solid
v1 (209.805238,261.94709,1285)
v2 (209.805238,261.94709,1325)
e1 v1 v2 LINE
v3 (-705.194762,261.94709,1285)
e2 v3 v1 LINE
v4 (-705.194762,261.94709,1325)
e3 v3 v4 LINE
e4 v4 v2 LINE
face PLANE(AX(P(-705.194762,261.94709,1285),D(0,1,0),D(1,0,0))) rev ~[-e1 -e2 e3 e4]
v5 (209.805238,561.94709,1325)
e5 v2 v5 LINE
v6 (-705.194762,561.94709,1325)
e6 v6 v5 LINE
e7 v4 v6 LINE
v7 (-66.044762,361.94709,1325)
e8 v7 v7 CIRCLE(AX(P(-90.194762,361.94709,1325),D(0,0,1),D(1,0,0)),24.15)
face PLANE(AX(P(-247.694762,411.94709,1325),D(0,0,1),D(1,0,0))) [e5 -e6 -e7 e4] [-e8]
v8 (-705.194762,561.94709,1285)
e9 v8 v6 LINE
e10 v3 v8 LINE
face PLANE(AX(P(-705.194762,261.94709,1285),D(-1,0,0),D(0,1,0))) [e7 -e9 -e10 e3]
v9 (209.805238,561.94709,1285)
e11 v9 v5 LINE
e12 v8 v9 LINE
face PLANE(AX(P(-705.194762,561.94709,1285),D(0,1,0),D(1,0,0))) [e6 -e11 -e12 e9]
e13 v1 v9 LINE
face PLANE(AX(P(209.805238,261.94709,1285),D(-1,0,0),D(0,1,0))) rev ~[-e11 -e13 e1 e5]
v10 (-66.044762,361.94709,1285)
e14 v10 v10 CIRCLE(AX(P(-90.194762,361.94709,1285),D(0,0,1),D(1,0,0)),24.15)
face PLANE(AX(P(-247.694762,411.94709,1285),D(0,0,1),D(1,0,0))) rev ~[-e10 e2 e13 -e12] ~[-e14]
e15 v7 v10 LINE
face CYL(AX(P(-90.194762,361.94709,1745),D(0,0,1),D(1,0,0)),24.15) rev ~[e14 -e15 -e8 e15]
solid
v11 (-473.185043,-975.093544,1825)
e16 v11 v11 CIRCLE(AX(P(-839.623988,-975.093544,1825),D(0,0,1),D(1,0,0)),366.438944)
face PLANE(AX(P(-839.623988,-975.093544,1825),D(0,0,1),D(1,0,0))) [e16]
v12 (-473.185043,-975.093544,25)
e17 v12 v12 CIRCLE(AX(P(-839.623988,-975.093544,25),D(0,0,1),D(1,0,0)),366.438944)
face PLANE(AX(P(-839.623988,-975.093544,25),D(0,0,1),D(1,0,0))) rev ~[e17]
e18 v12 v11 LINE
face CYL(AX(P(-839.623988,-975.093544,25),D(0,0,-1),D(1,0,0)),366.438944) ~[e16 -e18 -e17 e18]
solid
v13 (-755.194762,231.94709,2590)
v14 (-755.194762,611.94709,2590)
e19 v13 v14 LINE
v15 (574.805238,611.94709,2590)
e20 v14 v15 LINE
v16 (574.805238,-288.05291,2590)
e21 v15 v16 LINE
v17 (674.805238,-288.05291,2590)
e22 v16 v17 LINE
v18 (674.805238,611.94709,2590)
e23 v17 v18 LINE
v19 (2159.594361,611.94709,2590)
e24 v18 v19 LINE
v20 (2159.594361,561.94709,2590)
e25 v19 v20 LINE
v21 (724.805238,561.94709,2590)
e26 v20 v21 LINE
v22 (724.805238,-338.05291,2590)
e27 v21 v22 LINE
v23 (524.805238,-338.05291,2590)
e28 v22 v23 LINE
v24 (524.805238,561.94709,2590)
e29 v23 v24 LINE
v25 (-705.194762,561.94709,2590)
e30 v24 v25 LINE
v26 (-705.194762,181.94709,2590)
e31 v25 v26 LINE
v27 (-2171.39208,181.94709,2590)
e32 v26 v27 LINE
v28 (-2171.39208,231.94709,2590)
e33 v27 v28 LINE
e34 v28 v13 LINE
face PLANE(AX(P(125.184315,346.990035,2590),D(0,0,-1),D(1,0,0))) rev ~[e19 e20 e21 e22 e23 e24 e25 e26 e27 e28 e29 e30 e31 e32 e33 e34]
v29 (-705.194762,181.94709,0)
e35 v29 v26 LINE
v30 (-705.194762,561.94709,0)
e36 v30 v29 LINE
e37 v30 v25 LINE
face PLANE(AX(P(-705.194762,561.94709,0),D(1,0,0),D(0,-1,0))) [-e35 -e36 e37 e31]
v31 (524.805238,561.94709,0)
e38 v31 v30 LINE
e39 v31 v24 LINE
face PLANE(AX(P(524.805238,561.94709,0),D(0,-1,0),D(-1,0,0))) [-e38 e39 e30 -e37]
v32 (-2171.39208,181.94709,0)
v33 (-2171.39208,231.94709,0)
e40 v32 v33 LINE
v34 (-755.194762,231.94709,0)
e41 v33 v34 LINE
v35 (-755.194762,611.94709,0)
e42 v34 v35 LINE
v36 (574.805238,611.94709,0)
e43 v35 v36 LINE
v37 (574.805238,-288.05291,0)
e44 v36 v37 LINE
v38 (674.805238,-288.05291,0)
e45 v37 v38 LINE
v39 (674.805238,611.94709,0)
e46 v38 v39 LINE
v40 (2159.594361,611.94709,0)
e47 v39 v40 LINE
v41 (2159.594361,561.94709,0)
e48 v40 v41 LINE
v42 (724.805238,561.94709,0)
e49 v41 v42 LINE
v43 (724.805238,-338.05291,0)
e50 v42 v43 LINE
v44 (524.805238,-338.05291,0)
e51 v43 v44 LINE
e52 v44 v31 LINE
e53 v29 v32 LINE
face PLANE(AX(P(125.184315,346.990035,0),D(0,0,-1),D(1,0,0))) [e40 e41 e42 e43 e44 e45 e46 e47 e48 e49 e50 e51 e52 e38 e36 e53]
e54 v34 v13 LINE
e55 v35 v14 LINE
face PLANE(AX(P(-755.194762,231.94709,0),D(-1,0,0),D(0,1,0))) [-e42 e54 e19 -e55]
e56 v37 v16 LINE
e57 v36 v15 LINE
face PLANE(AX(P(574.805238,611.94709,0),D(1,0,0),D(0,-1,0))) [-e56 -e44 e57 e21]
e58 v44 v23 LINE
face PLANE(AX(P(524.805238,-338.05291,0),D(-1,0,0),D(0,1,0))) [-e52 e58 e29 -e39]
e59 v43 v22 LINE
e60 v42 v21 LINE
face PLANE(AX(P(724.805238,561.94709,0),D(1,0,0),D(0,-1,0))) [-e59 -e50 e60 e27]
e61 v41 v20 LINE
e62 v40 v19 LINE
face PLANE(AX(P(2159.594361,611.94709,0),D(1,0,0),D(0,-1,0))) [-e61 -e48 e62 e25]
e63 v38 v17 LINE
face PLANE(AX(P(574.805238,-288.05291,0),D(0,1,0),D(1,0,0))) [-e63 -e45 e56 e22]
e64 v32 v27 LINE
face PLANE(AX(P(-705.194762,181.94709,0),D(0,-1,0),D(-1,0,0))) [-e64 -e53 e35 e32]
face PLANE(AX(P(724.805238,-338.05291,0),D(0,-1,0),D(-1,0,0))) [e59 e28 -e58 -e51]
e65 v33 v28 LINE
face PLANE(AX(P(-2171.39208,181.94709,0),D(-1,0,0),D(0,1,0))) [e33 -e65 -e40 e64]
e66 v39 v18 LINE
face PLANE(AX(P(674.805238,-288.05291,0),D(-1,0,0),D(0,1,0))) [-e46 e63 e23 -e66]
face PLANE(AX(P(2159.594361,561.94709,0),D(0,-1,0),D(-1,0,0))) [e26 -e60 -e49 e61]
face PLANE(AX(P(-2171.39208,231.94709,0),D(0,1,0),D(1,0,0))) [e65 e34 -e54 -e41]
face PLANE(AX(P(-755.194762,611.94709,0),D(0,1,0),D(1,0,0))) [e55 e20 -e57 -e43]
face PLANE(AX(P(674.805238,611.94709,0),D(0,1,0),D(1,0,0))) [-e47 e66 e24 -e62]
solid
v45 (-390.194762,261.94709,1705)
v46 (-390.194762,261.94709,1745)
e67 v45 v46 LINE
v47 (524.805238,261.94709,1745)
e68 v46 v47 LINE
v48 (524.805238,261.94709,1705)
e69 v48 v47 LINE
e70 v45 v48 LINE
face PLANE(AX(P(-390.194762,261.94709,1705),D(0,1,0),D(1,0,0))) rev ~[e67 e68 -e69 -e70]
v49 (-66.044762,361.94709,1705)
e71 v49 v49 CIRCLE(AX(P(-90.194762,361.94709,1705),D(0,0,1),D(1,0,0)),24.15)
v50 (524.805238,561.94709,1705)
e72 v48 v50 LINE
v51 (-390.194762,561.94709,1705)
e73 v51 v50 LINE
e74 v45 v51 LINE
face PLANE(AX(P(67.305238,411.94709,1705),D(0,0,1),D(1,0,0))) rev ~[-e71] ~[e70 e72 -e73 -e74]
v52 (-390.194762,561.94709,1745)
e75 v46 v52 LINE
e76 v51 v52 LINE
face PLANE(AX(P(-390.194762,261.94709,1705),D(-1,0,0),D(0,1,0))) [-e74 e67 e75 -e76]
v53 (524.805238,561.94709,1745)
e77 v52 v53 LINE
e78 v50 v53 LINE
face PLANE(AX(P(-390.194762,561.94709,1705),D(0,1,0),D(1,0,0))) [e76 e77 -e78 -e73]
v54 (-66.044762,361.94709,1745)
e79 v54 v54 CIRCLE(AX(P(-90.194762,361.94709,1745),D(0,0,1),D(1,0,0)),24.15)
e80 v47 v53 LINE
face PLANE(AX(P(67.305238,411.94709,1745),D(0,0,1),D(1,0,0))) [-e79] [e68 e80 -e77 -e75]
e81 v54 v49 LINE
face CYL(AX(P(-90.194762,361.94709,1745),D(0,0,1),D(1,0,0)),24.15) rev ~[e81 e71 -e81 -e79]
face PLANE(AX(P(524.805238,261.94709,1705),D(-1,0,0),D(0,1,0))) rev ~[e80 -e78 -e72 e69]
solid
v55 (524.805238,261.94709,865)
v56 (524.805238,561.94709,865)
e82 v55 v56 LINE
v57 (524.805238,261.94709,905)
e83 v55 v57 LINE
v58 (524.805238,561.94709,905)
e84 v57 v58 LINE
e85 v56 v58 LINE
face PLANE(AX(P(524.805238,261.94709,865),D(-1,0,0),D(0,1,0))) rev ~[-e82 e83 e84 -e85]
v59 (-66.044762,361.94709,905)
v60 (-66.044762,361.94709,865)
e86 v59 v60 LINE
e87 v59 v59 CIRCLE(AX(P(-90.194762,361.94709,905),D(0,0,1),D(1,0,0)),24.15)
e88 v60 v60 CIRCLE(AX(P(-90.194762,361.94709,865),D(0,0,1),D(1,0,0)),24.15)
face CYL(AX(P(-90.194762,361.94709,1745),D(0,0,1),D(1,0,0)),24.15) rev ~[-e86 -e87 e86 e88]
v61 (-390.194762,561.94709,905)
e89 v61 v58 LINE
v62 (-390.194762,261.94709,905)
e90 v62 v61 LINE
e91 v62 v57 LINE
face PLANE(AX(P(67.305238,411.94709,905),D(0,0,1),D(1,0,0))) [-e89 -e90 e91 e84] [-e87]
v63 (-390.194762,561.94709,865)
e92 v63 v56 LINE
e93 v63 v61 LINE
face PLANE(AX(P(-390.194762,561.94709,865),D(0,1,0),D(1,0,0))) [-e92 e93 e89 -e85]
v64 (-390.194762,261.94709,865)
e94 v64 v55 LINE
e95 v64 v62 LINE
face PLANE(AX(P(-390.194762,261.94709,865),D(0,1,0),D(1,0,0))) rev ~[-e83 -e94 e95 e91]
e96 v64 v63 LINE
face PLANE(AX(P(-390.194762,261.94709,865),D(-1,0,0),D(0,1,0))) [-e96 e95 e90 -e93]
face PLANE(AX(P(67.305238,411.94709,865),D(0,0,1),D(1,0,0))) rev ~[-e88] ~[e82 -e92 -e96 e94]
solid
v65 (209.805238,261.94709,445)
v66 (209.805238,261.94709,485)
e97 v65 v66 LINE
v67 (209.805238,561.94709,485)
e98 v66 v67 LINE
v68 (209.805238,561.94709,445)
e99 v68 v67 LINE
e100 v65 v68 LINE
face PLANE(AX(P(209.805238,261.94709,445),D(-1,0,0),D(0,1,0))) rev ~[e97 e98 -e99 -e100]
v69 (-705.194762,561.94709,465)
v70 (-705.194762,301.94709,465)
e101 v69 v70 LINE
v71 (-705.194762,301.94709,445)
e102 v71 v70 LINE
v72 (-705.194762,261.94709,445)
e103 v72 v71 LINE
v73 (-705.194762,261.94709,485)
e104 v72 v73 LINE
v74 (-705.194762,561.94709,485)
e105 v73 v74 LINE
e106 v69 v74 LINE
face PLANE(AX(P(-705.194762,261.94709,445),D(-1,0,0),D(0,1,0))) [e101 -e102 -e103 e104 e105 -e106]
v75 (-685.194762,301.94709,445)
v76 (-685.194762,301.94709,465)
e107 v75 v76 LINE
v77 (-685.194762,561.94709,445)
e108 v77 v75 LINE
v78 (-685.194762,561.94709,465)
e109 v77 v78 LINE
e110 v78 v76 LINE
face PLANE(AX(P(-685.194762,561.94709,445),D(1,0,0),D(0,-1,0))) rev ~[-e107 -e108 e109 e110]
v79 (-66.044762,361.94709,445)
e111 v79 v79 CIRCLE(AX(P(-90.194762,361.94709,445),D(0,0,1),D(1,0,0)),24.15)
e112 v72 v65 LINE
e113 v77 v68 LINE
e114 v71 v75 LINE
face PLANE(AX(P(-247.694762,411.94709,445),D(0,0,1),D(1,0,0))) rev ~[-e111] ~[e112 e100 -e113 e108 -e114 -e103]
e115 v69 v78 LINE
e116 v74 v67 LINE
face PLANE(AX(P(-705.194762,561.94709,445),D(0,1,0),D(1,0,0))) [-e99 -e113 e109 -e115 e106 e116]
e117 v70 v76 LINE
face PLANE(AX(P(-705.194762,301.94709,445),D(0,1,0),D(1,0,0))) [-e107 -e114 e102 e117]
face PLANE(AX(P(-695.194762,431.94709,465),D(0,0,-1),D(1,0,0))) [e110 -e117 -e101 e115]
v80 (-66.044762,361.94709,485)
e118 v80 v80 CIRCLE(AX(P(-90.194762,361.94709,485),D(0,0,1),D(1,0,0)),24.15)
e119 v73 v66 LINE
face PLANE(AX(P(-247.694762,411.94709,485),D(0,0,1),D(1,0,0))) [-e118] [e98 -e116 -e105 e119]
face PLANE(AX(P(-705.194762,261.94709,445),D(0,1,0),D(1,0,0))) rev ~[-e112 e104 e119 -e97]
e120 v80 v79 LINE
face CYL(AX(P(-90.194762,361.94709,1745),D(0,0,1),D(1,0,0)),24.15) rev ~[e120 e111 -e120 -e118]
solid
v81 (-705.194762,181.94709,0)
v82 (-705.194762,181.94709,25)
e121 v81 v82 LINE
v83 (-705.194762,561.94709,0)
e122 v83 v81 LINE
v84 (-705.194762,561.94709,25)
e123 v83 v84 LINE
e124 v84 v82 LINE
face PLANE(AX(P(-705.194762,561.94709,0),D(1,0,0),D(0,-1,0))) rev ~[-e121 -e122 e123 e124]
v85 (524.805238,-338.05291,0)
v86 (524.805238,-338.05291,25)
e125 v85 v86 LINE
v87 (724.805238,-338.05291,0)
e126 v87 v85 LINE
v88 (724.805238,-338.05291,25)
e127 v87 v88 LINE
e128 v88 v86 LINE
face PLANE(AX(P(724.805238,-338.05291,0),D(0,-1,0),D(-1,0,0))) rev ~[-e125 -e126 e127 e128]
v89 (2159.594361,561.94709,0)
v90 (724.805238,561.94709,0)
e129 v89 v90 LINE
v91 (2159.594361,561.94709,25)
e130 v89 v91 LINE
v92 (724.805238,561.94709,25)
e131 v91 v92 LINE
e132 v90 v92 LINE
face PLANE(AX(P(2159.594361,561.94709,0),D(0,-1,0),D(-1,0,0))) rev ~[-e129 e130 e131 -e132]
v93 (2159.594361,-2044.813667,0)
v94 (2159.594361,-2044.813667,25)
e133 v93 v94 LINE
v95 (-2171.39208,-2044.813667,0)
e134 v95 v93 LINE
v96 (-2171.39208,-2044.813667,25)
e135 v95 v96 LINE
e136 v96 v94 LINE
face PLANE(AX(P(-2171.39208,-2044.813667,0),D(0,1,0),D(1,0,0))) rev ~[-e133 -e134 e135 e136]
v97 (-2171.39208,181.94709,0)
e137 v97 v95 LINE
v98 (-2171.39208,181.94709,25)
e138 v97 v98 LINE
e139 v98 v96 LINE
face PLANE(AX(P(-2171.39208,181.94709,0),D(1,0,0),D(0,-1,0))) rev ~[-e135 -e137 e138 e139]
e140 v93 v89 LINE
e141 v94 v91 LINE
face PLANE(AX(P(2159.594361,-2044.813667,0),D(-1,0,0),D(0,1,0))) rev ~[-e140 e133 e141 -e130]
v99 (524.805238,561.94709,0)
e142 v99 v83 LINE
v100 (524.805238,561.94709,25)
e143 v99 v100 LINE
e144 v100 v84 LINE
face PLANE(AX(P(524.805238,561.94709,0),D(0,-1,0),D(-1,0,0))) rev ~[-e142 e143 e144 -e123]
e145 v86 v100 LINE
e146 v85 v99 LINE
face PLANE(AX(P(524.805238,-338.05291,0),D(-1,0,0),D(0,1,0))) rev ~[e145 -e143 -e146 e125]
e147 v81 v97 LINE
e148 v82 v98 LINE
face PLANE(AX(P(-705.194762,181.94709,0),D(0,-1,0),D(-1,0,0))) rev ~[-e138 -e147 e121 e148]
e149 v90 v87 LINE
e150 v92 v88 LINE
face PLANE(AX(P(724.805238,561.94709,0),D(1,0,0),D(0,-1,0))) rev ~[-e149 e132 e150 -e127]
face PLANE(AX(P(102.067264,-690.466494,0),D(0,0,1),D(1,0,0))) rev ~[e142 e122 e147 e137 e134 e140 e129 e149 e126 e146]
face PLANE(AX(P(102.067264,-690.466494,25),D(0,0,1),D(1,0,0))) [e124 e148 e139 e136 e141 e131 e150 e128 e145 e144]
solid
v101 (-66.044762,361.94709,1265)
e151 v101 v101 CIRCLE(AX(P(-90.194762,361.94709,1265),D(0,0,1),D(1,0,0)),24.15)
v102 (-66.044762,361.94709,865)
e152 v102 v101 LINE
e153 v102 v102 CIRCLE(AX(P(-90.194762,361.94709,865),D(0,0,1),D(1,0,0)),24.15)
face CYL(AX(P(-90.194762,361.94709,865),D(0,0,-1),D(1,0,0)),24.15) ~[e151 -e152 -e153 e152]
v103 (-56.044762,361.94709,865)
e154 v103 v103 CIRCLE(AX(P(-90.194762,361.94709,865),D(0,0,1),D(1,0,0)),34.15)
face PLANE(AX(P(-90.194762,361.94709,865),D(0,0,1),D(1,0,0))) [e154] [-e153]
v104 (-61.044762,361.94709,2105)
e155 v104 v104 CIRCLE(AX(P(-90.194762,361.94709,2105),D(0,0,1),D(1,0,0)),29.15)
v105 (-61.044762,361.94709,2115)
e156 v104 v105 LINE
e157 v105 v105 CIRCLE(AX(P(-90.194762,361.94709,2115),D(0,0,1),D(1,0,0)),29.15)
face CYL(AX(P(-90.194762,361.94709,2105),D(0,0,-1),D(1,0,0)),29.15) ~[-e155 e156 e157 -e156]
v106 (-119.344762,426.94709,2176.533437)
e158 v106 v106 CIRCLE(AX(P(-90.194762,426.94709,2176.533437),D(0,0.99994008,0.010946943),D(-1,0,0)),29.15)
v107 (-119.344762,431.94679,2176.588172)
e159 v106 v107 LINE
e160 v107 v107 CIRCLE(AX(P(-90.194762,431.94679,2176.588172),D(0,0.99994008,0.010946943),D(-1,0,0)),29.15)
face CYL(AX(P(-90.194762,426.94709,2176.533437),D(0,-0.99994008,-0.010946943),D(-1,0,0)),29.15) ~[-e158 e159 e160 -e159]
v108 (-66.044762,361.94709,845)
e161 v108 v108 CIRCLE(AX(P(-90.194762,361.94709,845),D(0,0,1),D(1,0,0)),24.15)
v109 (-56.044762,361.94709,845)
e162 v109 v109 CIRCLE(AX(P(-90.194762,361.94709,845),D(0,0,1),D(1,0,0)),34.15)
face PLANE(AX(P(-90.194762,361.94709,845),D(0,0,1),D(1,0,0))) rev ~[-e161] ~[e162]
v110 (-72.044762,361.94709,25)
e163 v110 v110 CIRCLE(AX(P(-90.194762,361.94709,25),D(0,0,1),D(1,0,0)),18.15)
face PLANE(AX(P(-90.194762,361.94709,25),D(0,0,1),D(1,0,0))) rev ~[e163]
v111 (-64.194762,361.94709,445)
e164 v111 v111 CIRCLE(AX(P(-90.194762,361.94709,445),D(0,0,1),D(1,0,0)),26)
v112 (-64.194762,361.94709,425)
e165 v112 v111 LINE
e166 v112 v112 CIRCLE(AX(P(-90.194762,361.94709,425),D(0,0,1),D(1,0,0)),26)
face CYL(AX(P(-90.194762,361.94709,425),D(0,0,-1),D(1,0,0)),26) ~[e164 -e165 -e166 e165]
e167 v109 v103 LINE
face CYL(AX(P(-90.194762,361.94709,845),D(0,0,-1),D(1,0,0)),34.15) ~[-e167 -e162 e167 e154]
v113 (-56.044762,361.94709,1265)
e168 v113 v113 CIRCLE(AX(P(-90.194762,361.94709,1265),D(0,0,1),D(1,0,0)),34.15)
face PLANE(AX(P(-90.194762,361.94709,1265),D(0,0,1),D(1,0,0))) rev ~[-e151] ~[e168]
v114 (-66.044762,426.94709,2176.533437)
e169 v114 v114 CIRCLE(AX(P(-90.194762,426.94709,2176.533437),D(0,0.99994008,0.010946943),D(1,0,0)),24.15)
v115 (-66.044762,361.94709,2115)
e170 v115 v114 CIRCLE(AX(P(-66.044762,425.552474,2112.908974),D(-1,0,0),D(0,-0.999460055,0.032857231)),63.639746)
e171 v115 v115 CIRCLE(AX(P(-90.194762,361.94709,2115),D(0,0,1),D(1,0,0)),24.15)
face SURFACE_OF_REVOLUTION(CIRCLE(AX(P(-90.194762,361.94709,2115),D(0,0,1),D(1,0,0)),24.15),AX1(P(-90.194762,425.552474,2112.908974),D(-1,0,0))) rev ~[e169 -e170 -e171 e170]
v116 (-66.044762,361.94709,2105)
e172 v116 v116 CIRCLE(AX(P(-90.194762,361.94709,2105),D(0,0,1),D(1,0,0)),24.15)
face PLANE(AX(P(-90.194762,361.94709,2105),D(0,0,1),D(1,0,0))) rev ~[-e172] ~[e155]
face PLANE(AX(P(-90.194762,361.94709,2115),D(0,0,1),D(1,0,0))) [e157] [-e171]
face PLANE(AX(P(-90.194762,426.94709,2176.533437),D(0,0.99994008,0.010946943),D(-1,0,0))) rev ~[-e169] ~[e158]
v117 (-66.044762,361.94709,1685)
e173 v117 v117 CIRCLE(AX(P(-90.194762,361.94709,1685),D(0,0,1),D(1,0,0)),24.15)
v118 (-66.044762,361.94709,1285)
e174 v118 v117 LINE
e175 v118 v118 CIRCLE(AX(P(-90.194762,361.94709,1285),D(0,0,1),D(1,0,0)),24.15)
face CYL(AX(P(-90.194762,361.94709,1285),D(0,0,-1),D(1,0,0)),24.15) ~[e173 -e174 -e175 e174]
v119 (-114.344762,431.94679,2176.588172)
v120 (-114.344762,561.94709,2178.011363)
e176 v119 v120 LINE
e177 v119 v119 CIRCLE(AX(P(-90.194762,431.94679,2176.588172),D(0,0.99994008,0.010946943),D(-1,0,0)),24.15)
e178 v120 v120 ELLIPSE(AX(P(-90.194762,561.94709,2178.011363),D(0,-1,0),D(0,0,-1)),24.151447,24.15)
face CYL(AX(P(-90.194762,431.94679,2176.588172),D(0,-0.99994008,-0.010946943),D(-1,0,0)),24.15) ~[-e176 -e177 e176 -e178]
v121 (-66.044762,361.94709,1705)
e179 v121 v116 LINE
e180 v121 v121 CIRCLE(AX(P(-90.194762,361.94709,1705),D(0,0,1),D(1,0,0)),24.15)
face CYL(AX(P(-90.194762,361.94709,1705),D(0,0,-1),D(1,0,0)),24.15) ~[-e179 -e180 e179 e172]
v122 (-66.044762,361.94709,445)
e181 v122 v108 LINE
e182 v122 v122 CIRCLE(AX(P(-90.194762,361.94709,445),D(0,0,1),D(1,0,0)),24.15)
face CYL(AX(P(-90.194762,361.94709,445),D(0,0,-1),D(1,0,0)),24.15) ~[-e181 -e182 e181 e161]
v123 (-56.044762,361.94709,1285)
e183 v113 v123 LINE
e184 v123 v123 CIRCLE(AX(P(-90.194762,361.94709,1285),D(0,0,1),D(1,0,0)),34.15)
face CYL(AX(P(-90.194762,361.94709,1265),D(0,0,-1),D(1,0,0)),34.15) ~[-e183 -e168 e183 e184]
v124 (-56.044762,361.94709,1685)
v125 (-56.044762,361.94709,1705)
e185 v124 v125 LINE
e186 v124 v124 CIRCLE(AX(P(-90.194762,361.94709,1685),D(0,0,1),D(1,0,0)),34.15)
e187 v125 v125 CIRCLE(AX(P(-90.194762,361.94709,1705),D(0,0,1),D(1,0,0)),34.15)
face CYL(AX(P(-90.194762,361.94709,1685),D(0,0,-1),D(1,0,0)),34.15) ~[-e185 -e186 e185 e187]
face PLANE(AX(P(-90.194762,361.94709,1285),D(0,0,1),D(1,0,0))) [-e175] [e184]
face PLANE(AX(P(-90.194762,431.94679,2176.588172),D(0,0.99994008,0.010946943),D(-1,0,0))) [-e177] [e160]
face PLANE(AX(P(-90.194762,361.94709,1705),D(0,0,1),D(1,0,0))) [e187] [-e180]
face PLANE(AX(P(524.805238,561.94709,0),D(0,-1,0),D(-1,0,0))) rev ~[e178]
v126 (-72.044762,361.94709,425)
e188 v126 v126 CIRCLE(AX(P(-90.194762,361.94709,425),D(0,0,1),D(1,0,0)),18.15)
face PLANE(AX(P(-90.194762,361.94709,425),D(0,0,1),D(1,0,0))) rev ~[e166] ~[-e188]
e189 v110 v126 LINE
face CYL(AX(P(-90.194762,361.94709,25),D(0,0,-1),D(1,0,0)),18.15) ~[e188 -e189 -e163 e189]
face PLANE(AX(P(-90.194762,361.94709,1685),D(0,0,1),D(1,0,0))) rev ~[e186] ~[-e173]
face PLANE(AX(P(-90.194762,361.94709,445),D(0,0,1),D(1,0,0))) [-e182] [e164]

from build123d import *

# Parameters (mm, degrees)
F1_DEPTH  = 25
F3_DEPTH  = 2590
F9_W      = 915
F9_H      = 300
F10_DEPTH = 40
F11_W     = 915
F11_H     = 300
F12_DEPTH = 40
F13_W     = 915
F13_H     = 300
F14_DEPTH = 40
F15_W     = 915
F15_H     = 300
F16_DEPTH = 40
F17_R     = 18.15
F18_DEPTH = 400
F19_R     = 24.15
F20_DEPTH = 1320
F21_R     = 26
F22_DEPTH = 20
F23_R     = 24.15
F24_DEPTH = 400
F25_R     = 34.15
F26_DEPTH = 20
F27_R     = 24.15
F28_DEPTH = 400
F29_R     = 34.15
F30_DEPTH = 20
F31_R     = 24.15
F32_DEPTH = 400
F33_R     = 34.15
F34_DEPTH = 20
F35_R     = 24.15
F36_DEPTH = 400
F37_R     = 29.15
F38_DEPTH = 10
F42_R     = 24.15
F47_R     = 29.15
F48_DEPTH = 5
F49_R     = 24.15
F50_REACH = 252.8226248047
F51_R     = 366.4389442896
F52_DEPTH = 1800
F53_W     = 20
F53_H     = 260
F54_DEPTH = 20


with BuildPart() as f1:
    # F0 (on Top) → F1 (new body)
    with BuildSketch(Plane.XY):
        Polygon((-705.1947621593, 181.9470898961), (-2171.3920796187, 181.9470898961), (-2171.3920796187, -2044.813666757), (2159.594360915, -2044.813666757), (2159.594360915, 561.9470898961), (724.8052378407, 561.9470898961), (724.8052378407, -338.0529101039), (524.8052378407, -338.0529101039), (524.8052378407, 561.9470898961), (-705.1947621593, 561.9470898961), align=None)
    extrude(amount=F1_DEPTH)


with BuildPart() as f3:
    # F2 (on face) → F3 (new body)
    with BuildSketch(Plane(origin=(0, 0, 0), x_dir=(1, 0, 0), z_dir=(0, 0, -1))):
        Polygon((-705.1947621593, -181.9470898961), (-2171.3920796187, -181.9470898961), (-2171.3920796187, -231.9470898961), (-755.1947621593, -231.9470898961), (-755.1947621593, -611.9470898961), (574.8052378407, -611.9470898961), (574.8052378407, 288.0529101039), (674.8052378407, 288.0529101039), (674.8052378407, -611.9470898961), (2159.594360915, -611.9470898961), (2159.594360915, -561.9470898961), (724.8052378407, -561.9470898961), (724.8052378407, 338.0529101039), (524.8052378407, 338.0529101039), (524.8052378407, -561.9470898961), (-705.1947621593, -561.9470898961), align=None)
    extrude(amount=-F3_DEPTH)


with BuildPart() as f10:
    # F9 (on offset) → F10 (new body)
    with BuildSketch(Plane.XY.offset(445)):
        with Locations((-247.6947621593, 411.9470898961)):
            Rectangle(F9_W, F9_H)
    extrude(amount=F10_DEPTH)


with BuildPart() as f12:
    # F11 (on offset) → F12 (new body)
    with BuildSketch(Plane.XY.offset(865)):
        with Locations((67.3052378407, 411.9470898961)):
            Rectangle(F11_W, F11_H)
    extrude(amount=F12_DEPTH)


with BuildPart() as f14:
    # F13 (on offset) → F14 (new body)
    with BuildSketch(Plane.XY.offset(1285)):
        with Locations((-247.6947621593, 411.9470898961)):
            Rectangle(F13_W, F13_H)
    extrude(amount=F14_DEPTH)


with BuildPart() as f16:
    # F15 (on offset) → F16 (new body)
    with BuildSketch(Plane.XY.offset(1705)):
        with Locations((67.3052378407, 411.9470898961)):
            Rectangle(F15_W, F15_H)
    extrude(amount=F16_DEPTH)


with BuildPart() as f18:
    # F17 (on face) → F18 (new body)
    with BuildSketch(Plane.XY.offset(25)):
        with Locations((-90.1947621593, 361.9470898961)):
            Circle(F17_R)
    extrude(amount=F18_DEPTH)

    # F21 (on face) → F22 (join)
    with BuildSketch(Plane.XY.offset(425)):
        with Locations((-90.1947621593, 361.9470898961)):
            Circle(F21_R)
    extrude(amount=F22_DEPTH)

    # F23 (on face) → F24 (join)
    with BuildSketch(Plane.XY.offset(445)):
        with Locations((-90.1947621593, 361.9470898961)):
            Circle(F23_R)
    extrude(amount=F24_DEPTH)

    # F25 (on face) → F26 (join)
    with BuildSketch(Plane.XY.offset(845)):
        with Locations((-90.1947621593, 361.9470898961)):
            Circle(F25_R)
    extrude(amount=F26_DEPTH)

    # F27 (on face) → F28 (join)
    with BuildSketch(Plane.XY.offset(865)):
        with Locations((-90.1947621593, 361.9470898961)):
            Circle(F27_R)
    extrude(amount=F28_DEPTH)

    # F29 (on face) → F30 (join)
    with BuildSketch(Plane.XY.offset(1265)):
        with Locations((-90.1947621593, 361.9470898961)):
            Circle(F29_R)
    extrude(amount=F30_DEPTH)

    # F31 (on face) → F32 (join)
    with BuildSketch(Plane.XY.offset(1285)):
        with Locations((-90.1947621593, 361.9470898961)):
            Circle(F31_R)
    extrude(amount=F32_DEPTH)

    # F33 (on face) → F34 (join)
    with BuildSketch(Plane.XY.offset(1685)):
        with Locations((-90.1947621593, 361.9470898961)):
            Circle(F33_R)
    extrude(amount=F34_DEPTH)

    # F35 (on face) → F36 (join)
    with BuildSketch(Plane.XY.offset(1705)):
        with Locations((-90.1947621593, 361.9470898961)):
            Circle(F35_R)
    extrude(amount=F36_DEPTH)

    # F37 (on face) → F38 (join)
    with BuildSketch(Plane.XY.offset(2105)):
        with Locations((-90.1947621593, 361.9470898961)):
            Circle(F37_R)
    extrude(amount=F38_DEPTH)

    # F46: sweep along a path in F45
    with BuildLine(Plane(origin=(-90.1947621593, 0, 0), x_dir=(0, -1, 0), z_dir=(-1, 0, 0))) as f46_path:
        ThreePointArc((-361.9470898961, 2115), (-381.8016351531, 2159.12457081), (-426.9470898961, 2176.5334373028))
    # F42 (on face) → F46 (sweep)
    with BuildSketch(Plane.XY.offset(2115)):
        with Locations((-90.1947621593, 361.9470898961)):
            Circle(F42_R)
    sweep(path=f46_path.line)

    # F47 (on face) → F48 (join)
    with BuildSketch(Plane(origin=(0, 450.7208860992, 4.9343114773), x_dir=(-1, 0, 0), z_dir=(0, 0.9999400804, 0.0109469429))):
        with Locations((90.1947621593, 2171.7292549193)):
            Circle(F47_R)
    extrude(amount=F48_DEPTH)

    f50_end = f3.part.faces().sort_by_distance((-90.1947621593, 561.9470898961, 1295))[0]
    # F49 (on face) → F50 (join, up to a face of F3 that its end follows)
    with BuildSketch(Plane(origin=(0, 455.7205865013, 4.9890461919), x_dir=(-1, 0, 0), z_dir=(0, 0.9999400804, 0.0109469429))):
        with Locations((90.1947621593, 2171.7292549193)):
            Circle(F49_R)
    f50_long = extrude(amount=F50_REACH, mode=Mode.PRIVATE)
    add(split(f50_long, bisect_by=f50_end, keep=Keep.TOP, mode=Mode.PRIVATE))


with BuildPart() as f20_tool:
    # F19 (on face) → F20 (new body)
    with BuildSketch(Plane.XY.offset(1745)):
        with Locations((-90.1947621593, 361.9470898961)):
            Circle(F19_R)
    extrude(amount=-F20_DEPTH)


with BuildPart() as f10_1:
    add(f10.part)

    # F20: cut by f20_tool
    add(f20_tool.part, mode=Mode.SUBTRACT)

    # F53 (on face) → F54 (cut)
    with BuildSketch(Plane(origin=(0, 0, 445), x_dir=(1, 0, 0), z_dir=(0, 0, -1))):
        with Locations((-695.1947621593, -431.9470898961)):
            Rectangle(F53_W, F53_H)
    extrude(amount=-F54_DEPTH, mode=Mode.SUBTRACT)


with BuildPart() as f12_1:
    add(f12.part)

    # F20: cut by f20_tool
    add(f20_tool.part, mode=Mode.SUBTRACT)


with BuildPart() as f14_1:
    add(f14.part)

    # F20: cut by f20_tool
    add(f20_tool.part, mode=Mode.SUBTRACT)


with BuildPart() as f16_1:
    add(f16.part)

    # F20: cut by f20_tool
    add(f20_tool.part, mode=Mode.SUBTRACT)


with BuildPart() as f52:
    # F51 (on face) → F52 (new body)
    with BuildSketch(Plane.XY.offset(25)):
        with Locations((-839.6239876747, -975.0935435295)):
            Circle(F51_R)
    extrude(amount=F52_DEPTH)


solid = Compound([f1.part, f3.part, f18.part, f10_1.part, f12_1.part, f14_1.part, f16_1.part, f52.part])
